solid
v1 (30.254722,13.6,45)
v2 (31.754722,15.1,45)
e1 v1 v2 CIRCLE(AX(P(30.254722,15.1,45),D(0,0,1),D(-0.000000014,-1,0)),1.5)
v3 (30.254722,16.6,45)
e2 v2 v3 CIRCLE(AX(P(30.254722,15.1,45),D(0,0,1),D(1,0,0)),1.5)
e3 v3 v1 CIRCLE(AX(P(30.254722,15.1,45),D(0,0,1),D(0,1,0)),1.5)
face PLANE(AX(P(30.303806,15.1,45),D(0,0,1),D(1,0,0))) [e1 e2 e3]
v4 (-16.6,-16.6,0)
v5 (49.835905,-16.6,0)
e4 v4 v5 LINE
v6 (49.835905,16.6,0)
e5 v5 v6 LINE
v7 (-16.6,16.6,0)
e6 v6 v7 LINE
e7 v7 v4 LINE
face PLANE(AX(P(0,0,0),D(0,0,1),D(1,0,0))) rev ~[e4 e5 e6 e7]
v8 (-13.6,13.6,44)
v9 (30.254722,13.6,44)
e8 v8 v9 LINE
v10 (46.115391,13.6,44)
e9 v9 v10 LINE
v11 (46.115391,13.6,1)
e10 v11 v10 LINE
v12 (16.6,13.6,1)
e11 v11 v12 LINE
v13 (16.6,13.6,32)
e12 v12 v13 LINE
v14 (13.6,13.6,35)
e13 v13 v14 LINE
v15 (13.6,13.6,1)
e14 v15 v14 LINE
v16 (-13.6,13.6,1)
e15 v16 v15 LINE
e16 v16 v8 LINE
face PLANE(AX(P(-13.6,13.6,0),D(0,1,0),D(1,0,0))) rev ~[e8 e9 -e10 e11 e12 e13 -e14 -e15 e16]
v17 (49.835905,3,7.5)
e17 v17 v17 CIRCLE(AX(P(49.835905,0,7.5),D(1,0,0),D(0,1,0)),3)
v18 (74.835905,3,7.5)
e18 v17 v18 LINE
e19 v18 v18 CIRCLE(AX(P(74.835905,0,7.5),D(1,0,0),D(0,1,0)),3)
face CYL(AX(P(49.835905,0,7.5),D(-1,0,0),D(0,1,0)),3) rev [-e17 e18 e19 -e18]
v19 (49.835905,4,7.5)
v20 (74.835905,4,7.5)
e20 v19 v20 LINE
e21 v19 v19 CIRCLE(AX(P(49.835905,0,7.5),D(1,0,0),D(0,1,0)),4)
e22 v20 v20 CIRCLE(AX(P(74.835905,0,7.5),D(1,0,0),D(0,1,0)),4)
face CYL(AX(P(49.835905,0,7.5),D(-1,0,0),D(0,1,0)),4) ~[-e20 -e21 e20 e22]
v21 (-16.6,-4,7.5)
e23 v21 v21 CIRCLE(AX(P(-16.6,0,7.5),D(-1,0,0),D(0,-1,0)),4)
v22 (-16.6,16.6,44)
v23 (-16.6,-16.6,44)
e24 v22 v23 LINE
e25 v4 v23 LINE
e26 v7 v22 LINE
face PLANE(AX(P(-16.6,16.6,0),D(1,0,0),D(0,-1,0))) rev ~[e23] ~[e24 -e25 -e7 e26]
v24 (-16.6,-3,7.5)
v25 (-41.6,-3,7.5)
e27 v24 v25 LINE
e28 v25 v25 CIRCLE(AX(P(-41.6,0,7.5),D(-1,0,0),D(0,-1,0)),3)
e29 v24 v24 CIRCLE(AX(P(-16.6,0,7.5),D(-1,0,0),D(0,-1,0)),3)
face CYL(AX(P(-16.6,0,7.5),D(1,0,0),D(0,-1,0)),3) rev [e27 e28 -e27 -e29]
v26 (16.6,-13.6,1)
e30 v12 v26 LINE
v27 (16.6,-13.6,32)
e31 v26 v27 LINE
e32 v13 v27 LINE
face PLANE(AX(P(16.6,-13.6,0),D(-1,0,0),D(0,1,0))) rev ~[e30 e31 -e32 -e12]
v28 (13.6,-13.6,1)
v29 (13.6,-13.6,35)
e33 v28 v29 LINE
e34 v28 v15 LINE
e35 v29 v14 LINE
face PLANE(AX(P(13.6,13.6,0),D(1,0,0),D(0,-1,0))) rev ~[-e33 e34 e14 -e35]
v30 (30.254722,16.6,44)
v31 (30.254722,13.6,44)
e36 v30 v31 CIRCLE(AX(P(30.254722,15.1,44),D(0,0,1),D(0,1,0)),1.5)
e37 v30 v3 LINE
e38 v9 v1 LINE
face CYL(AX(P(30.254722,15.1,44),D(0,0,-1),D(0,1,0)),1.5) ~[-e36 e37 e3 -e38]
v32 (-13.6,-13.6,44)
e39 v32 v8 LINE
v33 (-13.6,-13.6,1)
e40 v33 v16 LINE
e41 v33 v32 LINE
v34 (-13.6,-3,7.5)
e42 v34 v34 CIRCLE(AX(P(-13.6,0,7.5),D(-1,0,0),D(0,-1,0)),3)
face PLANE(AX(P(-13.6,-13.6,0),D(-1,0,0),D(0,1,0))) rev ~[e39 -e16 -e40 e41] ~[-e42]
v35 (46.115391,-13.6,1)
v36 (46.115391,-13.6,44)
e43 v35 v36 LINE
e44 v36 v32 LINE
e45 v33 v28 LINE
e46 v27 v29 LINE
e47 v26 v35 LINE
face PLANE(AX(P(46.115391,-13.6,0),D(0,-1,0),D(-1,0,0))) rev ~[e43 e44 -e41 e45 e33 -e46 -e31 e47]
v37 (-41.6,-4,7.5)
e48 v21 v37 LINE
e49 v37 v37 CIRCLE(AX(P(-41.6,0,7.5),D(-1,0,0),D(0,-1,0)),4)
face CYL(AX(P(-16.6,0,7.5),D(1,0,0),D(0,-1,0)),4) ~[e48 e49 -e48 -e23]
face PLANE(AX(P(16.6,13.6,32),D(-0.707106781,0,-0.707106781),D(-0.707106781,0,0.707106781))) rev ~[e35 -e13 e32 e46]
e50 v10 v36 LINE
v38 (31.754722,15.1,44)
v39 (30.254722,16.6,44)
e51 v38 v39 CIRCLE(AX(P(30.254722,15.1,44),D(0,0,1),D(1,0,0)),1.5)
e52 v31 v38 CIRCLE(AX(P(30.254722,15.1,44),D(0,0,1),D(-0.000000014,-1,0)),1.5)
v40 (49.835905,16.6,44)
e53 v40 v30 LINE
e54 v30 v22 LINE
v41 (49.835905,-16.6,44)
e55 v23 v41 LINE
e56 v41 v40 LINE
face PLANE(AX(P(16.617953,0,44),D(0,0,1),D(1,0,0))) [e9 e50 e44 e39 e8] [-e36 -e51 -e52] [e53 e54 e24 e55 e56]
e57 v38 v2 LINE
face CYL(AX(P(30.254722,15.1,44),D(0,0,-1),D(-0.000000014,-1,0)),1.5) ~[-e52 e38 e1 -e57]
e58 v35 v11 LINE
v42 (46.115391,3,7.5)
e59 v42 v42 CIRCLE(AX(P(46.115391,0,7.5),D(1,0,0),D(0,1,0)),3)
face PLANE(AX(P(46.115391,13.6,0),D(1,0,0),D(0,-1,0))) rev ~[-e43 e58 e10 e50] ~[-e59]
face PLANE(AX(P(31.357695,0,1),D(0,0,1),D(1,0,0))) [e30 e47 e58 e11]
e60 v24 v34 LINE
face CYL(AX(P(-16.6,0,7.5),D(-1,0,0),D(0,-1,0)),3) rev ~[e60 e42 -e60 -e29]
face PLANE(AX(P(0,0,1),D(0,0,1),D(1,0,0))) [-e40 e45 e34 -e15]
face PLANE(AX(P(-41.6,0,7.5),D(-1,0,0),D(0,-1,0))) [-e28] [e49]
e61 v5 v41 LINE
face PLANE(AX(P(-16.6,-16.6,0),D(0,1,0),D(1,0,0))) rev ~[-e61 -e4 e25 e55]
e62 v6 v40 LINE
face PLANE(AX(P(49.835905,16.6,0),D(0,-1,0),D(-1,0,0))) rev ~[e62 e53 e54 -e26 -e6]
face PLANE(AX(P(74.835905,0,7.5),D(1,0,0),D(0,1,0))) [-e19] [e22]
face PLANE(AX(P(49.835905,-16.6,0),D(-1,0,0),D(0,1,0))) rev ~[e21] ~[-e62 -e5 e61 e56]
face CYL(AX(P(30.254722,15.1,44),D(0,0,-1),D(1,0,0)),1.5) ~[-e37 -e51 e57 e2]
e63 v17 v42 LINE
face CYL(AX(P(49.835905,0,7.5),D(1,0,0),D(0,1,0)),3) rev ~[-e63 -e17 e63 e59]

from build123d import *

# Parameters (mm, degrees)
F1_DEPTH     = 44
F0_W         = 27.2
F0_H         = 27.2
F2_DEPTH     = 1
F3_DEPTH     = 37
F4_R         = 4
F4_R_2       = 3
F5_DEPTH     = 25
F6_DEPTH     = 5
F7_R         = 4
F7_R_2       = 3
F8_DEPTH     = 25
F9_DEPTH     = 5
F10_T1_DEPTH = 27.2
F12_DEPTH    = 1


# Not quite as in the source:
# - a fillet or chamfer that OpenCascade refuses, or shapes differently, is made with other operations: its cross-section is extruded or revolved along the edge and cut away or added


with BuildPart() as f1:
    # F0 (on Top) → F1 (new body)
    with BuildSketch(Plane.XY):
        Polygon((49.8359054327, 16.6), (16.6, 16.6), (-16.6, 16.6), (-16.6, 3), (-16.6, 2), (-16.6, -2), (-16.6, -3), (-16.6, -16.6), (16.6, -16.6), (49.8359054327, -16.6), (49.8359054327, -3), (49.8359054327, -2), (49.8359054327, 2), (49.8359054327, 3), align=None)
        Polygon((16.6, -13.6), (13.6, -13.6), (-13.6, -13.6), (-13.6, 13.6), (13.6, 13.6), (16.6, 13.6), (46.1153909564, 13.6), (46.1153909564, -13.6), align=None, mode=Mode.SUBTRACT)
    extrude(amount=F1_DEPTH)

    # F0 (on Top) → F2 (join)
    with BuildSketch(Plane.XY):
        Rectangle(F0_W, F0_H)
        Polygon((16.6, -3), (16.6, -13.6), (46.1153909564, -13.6), (46.1153909564, 13.6), (16.6, 13.6), (16.6, 3), align=None)
    extrude(amount=F2_DEPTH)

    # F0 (on Top) → F3 (join)
    with BuildSketch(Plane.XY):
        Polygon((13.6, 13.6), (13.6, -13.6), (16.6, -13.6), (16.6, -3), (16.6, 3), (16.6, 13.6), align=None)
    extrude(amount=F3_DEPTH)

    # F4 (on face) → F5 (join)
    with BuildSketch(Plane(origin=(-16.6, 0, 0), x_dir=(0, -1, 0), z_dir=(-1, 0, 0))):
        with Locations((0, 7.5)):
            Circle(F4_R)
        with Locations((0, 7.5)):
            Circle(F4_R_2, mode=Mode.SUBTRACT)
    extrude(amount=F5_DEPTH)

    # F6 (cut): a face of the model
    f6_faces = [f1.faces().sort_by_distance(p)[0] for p in [
        (-16.6, 0, 7.5),
    ]]
    extrude(f6_faces, amount=-F6_DEPTH, mode=Mode.SUBTRACT)

    # F7 (on face) → F8 (join)
    with BuildSketch(Plane.YZ.offset(49.8359054327)):
        with Locations((0, 7.5)):
            Circle(F7_R)
        with Locations((0, 7.5)):
            Circle(F7_R_2, mode=Mode.SUBTRACT)
    extrude(amount=F8_DEPTH)

    # F9 (cut): a face of the model
    f9_faces = [f1.faces().sort_by_distance(p)[0] for p in [
        (49.8359054327, 0, 7.5),
    ]]
    extrude(f9_faces, amount=-F9_DEPTH, mode=Mode.SUBTRACT)

    # F10: chamfer of 5 on 1 edges, made by hand

    # F10_s2 → F10_t1 (cut)
    with BuildSketch(Plane.XZ.offset(-13.6)):
        Polygon((16.6, 32), (11.6, 37), (16.6, 37), align=None)
    extrude(amount=F10_T1_DEPTH, mode=Mode.SUBTRACT)

    # F11 (on face) → F12 (join)
    with BuildSketch(Plane.XY.offset(44)):
        with BuildLine():
            ThreePointArc((30.2547216209, 13.6), (31.315381806, 14.0393398209), (31.7547216415, 15.1))
            ThreePointArc((31.7547216415, 15.1), (31.3153818133, 16.1606601718), (30.2547216415, 16.6))
            ThreePointArc((30.2547216415, 16.6), (28.7547216415, 15.1000000103), (30.2547216209, 13.6))
        make_face()
    extrude(amount=F12_DEPTH)


solid = f1.part
